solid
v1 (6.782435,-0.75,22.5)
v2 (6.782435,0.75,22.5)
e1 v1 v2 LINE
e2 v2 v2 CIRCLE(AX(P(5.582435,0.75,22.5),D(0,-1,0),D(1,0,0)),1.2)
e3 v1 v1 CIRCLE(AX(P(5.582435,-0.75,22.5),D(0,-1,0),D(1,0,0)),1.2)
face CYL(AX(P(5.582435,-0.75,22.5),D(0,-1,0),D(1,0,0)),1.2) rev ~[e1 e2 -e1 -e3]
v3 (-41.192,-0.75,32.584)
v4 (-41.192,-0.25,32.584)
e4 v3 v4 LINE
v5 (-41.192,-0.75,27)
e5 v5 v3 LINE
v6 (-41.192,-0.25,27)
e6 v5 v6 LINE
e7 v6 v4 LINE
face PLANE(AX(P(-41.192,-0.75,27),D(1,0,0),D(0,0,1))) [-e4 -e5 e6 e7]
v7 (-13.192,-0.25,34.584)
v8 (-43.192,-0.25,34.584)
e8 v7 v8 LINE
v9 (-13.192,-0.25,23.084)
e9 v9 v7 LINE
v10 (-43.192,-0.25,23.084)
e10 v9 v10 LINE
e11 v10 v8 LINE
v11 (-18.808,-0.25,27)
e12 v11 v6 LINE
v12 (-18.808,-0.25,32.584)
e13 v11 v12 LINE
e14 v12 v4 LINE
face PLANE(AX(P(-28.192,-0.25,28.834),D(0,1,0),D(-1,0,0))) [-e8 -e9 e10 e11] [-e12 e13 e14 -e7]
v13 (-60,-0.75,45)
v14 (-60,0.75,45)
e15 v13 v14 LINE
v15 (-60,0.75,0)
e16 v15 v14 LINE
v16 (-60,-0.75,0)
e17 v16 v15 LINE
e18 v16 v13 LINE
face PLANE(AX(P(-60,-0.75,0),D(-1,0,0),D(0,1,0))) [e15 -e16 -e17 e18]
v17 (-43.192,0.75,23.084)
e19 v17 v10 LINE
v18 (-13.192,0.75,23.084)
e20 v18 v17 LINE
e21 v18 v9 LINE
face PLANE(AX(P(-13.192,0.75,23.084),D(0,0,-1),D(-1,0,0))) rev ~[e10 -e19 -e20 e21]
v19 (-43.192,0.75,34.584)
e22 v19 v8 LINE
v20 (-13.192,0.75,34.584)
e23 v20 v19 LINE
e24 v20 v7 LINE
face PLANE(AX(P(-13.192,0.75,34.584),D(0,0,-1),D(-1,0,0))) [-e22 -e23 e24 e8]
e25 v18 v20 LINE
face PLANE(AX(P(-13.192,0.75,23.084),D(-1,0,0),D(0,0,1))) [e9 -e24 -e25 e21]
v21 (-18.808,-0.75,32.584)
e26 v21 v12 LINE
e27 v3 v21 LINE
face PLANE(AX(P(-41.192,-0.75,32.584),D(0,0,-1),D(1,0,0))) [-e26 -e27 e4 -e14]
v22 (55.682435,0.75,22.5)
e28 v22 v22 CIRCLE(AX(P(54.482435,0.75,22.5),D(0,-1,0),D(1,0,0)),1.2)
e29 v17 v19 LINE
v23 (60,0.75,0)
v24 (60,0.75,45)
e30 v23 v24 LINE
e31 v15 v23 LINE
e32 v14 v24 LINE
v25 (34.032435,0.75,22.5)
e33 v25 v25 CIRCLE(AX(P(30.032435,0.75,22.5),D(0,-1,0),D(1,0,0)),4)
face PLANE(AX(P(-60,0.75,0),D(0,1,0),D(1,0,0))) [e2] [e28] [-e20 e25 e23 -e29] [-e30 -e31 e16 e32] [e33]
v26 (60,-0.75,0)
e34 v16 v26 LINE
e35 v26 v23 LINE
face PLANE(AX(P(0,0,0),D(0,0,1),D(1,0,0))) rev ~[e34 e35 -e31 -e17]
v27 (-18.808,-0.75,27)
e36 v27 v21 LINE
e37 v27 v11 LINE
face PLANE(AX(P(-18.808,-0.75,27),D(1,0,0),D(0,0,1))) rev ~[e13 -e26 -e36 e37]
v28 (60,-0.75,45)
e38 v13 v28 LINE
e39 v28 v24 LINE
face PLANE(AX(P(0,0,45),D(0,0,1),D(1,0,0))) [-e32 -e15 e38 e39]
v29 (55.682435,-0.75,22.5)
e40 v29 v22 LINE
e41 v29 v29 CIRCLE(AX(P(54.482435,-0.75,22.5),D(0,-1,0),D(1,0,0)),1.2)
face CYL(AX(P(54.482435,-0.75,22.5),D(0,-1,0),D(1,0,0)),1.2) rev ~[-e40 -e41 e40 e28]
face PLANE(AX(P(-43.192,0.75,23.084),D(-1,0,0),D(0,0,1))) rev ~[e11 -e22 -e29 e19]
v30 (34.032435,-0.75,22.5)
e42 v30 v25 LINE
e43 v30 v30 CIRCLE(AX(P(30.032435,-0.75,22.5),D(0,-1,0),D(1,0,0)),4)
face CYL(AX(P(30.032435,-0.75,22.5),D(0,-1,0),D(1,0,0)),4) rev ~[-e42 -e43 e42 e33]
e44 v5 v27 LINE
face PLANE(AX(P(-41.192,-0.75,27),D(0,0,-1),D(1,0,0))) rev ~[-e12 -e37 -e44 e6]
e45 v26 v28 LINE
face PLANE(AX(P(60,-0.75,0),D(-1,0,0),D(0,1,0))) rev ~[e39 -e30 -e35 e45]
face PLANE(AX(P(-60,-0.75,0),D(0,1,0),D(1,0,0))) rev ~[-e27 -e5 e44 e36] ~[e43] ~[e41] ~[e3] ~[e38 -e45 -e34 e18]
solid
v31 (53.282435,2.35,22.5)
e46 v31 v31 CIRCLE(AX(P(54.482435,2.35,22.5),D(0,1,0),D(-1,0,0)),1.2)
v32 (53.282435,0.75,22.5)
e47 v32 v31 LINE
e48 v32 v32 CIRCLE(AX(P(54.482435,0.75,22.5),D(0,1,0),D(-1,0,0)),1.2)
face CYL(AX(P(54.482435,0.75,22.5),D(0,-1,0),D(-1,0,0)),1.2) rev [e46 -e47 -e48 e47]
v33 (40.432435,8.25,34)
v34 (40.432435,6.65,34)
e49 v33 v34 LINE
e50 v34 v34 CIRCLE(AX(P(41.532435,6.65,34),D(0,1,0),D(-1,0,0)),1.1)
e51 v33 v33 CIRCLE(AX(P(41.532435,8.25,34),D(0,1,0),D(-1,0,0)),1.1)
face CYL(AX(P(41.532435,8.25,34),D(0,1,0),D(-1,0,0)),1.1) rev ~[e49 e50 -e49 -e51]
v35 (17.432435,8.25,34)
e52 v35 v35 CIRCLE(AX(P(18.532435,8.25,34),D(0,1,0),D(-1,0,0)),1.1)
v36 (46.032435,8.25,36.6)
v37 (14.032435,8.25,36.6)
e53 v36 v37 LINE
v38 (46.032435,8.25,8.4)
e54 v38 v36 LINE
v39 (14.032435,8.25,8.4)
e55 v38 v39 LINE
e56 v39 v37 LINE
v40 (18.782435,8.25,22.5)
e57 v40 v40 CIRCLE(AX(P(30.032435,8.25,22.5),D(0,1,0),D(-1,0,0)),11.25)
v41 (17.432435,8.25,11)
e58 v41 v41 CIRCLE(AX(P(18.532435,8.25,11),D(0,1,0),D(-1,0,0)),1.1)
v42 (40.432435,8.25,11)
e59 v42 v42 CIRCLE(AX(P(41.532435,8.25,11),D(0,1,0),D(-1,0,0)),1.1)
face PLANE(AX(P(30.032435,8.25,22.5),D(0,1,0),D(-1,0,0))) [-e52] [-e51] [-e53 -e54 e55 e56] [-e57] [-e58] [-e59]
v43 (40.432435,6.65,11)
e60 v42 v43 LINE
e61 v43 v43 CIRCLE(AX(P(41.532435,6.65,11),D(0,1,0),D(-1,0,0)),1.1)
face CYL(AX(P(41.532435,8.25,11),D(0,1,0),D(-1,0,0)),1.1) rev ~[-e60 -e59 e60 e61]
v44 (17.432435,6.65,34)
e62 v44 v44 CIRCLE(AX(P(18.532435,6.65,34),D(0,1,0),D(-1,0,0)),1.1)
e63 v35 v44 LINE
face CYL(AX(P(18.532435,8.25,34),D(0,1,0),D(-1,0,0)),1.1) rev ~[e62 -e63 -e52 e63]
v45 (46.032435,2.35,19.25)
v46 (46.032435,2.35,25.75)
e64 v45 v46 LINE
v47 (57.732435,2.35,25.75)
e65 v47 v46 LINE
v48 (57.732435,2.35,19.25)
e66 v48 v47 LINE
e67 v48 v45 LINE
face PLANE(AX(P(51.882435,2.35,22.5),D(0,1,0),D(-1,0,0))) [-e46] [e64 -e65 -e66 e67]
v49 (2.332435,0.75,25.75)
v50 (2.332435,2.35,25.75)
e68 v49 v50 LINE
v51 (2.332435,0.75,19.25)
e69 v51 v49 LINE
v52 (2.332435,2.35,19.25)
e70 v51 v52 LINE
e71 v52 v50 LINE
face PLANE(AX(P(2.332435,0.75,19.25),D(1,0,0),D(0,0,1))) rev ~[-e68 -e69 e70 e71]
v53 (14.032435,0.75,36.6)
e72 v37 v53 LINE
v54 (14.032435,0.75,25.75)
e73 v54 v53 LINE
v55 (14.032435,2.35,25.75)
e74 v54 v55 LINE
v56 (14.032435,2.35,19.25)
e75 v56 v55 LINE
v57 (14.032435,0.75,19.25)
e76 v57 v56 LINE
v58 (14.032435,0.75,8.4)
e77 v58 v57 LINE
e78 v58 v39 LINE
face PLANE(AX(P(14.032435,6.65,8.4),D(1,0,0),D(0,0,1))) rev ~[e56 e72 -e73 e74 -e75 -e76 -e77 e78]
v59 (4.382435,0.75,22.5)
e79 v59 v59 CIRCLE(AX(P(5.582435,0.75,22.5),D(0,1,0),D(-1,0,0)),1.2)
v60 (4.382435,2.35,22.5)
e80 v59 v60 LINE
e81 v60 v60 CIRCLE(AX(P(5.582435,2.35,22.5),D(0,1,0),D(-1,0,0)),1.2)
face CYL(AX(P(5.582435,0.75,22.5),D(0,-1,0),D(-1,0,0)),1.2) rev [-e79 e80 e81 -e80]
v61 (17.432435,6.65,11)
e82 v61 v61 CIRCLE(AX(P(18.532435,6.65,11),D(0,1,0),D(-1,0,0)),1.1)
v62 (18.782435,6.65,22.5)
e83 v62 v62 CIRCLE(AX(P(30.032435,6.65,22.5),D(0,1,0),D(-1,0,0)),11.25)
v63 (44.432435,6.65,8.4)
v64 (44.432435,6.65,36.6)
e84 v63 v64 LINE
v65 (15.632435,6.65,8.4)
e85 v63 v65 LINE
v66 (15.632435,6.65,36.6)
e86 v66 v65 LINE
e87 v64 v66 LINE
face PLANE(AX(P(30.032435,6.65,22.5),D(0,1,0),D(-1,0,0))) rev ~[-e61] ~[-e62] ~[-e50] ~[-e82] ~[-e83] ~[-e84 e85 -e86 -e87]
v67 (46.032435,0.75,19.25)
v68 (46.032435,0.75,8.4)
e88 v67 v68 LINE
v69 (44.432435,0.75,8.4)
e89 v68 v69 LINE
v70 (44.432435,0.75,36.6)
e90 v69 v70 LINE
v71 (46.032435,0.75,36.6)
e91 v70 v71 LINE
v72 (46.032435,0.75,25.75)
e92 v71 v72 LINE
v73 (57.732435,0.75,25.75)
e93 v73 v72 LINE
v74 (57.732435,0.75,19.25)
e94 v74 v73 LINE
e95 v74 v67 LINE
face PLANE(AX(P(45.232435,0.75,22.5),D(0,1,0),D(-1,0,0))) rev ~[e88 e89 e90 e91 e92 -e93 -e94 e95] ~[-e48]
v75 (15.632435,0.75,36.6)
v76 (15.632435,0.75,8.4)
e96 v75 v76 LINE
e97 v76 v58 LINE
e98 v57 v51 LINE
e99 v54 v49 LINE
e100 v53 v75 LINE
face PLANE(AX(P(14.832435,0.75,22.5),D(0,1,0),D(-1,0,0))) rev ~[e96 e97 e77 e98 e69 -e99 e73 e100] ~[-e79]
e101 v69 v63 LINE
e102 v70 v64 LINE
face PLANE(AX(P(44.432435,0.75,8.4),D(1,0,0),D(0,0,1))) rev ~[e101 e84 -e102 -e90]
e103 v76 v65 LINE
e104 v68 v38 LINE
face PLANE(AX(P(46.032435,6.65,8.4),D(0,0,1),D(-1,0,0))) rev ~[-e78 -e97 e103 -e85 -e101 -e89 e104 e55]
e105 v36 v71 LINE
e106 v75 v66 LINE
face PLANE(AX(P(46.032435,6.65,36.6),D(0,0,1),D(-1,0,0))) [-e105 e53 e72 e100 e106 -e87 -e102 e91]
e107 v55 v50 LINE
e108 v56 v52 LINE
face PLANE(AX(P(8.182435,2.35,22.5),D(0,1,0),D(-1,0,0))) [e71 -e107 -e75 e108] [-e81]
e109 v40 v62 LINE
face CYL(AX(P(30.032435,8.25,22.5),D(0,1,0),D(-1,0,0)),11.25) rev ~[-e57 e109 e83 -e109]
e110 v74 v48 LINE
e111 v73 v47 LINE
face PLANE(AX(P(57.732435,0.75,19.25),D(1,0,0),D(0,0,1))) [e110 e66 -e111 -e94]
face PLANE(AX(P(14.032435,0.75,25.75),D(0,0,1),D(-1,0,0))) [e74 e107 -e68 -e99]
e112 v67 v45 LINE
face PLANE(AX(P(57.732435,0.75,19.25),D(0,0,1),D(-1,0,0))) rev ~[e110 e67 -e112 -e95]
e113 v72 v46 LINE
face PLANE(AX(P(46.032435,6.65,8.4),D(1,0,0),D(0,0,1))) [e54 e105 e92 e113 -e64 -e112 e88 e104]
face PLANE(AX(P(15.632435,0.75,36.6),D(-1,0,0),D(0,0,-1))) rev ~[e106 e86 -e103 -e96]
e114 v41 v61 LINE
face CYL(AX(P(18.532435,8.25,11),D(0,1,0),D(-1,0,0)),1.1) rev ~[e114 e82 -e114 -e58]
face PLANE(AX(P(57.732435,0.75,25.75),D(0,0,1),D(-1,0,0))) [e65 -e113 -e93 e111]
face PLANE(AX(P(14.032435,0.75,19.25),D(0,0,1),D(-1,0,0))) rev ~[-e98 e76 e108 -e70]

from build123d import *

# Parameters (mm, degrees)
F0_W      = 120
F0_H      = 1.5
F1_DEPTH  = 45
F2_R      = 4
F3_DEPTH  = 25
F4_R      = 1.2
F5_DEPTH  = 25
F6_W      = 11.7
F6_H      = 6.5
F6_R      = 1.2
F7_DEPTH  = 1.6
F8_DEPTH  = 5.9
F9_W      = 32
F9_H      = 28.2
F10_DEPTH = 1.6
F11_R     = 11.25
F12_DEPTH = 25
F13_R     = 1.1
F14_DEPTH = 25
F15_W     = 22.384
F15_H     = 5.584
F16_DEPTH = 25
F17_W     = 30
F17_H     = 11.5
F17_W_2   = 22.384
F17_H_2   = 5.584
F18_DEPTH = 1


with BuildPart() as f1:
    # F0 (on Top) → F1 (new body)
    with BuildSketch(Plane.XY):
        Rectangle(F0_W, F0_H)
    extrude(amount=F1_DEPTH)

    # F2 (on face) → F3 (cut)
    with BuildSketch(Plane.XZ.offset(0.75)):
        with Locations((30.0324354321, 22.5)):
            Circle(F2_R)
    extrude(amount=-F3_DEPTH, mode=Mode.SUBTRACT)

    # F4 (on face) → F5 (cut)
    with BuildSketch(Plane.XZ.offset(0.75)):
        with Locations((5.5824354321, 22.5)):
            Circle(F4_R)
        with Locations((54.4824354321, 22.5)):
            Circle(F4_R)
    extrude(amount=-F5_DEPTH, mode=Mode.SUBTRACT)

    # F15 (on face) → F16 (cut)
    with BuildSketch(Plane.XZ.offset(0.75)):
        with Locations((-30, 29.792)):
            Rectangle(F15_W, F15_H)
    extrude(amount=-F16_DEPTH, mode=Mode.SUBTRACT)

    # F17 (on face) → F18 (cut)
    with BuildSketch(Plane(origin=(0, 0.75, 0), x_dir=(-1, 0, 0), z_dir=(0, 1, 0))):
        with Locations((28.192, 28.834)):
            Rectangle(F17_W, F17_H)
        with Locations((30, 29.792)):
            Rectangle(F17_W_2, F17_H_2, mode=Mode.SUBTRACT)
    extrude(amount=-F18_DEPTH, mode=Mode.SUBTRACT)


with BuildPart() as f7:
    # F6 (on face) → F7 (new body)
    with BuildSketch(Plane(origin=(0, 0.75, 0), x_dir=(-1, 0, 0), z_dir=(0, 1, 0))):
        with Locations((-51.8824354321, 22.5)):
            Rectangle(F6_W, F6_H)
        with Locations((-54.4824354321, 22.5)):
            Circle(F6_R, mode=Mode.SUBTRACT)
    extrude(amount=F7_DEPTH)

    # F6 (on face) → F8 (join)
    with BuildSketch(Plane(origin=(0, 0.75, 0), x_dir=(-1, 0, 0), z_dir=(0, 1, 0))):
        Polygon((-46.0324354321, 36.6), (-46.0324354321, 25.75), (-46.0324354321, 19.25), (-46.0324354321, 8.4), (-44.4324354321, 8.4), (-44.4324354321, 36.6), align=None)
    extrude(amount=F8_DEPTH)



with BuildPart() as f7b:
    # F6 (on face) → F7, piece 2 (new body)
    with BuildSketch(Plane(origin=(0, 0.75, 0), x_dir=(-1, 0, 0), z_dir=(0, 1, 0))):
        with Locations((-8.1824354321, 22.5)):
            Rectangle(F6_W, F6_H)
        with Locations((-5.5824354321, 22.5)):
            Circle(F6_R, mode=Mode.SUBTRACT)
    extrude(amount=F7_DEPTH)

    # F6 (on face) → F8, piece 2 (join)
    with BuildSketch(Plane(origin=(0, 0.75, 0), x_dir=(-1, 0, 0), z_dir=(0, 1, 0))):
        Polygon((-14.0324354321, 25.75), (-14.0324354321, 36.6), (-15.6324354321, 36.6), (-15.6324354321, 8.4), (-14.0324354321, 8.4), (-14.0324354321, 19.25), align=None)
    extrude(amount=F8_DEPTH)


with BuildPart() as f7_1:
    add(f7.part)

    add(f7b.part)  # F10 merges F7b
    # F9 (on face) → F10 (join)
    with BuildSketch(Plane(origin=(0, 6.65, 0), x_dir=(-1, 0, 0), z_dir=(0, 1, 0))):
        with Locations((-30.0324354321, 22.5)):
            Rectangle(F9_W, F9_H)
    extrude(amount=F10_DEPTH)

    # F11 (on face) → F12 (cut)
    with BuildSketch(Plane(origin=(0, 8.25, 0), x_dir=(-1, 0, 0), z_dir=(0, 1, 0))):
        with Locations((-30.0324354321, 22.5)):
            Circle(F11_R)
    extrude(amount=-F12_DEPTH, mode=Mode.SUBTRACT)

    # F13 (on face) → F14 (cut)
    with BuildSketch(Plane(origin=(0, 8.25, 0), x_dir=(-1, 0, 0), z_dir=(0, 1, 0))):
        with Locations((-41.5324354321, 34)):
            Circle(F13_R)
        with Locations((-18.5324354321, 34)):
            Circle(F13_R)
        with Locations((-18.5324354321, 11)):
            Circle(F13_R)
        with Locations((-41.5324354321, 11)):
            Circle(F13_R)
    extrude(amount=-F14_DEPTH, mode=Mode.SUBTRACT)


solid = Compound([f1.part, f7_1.part])
